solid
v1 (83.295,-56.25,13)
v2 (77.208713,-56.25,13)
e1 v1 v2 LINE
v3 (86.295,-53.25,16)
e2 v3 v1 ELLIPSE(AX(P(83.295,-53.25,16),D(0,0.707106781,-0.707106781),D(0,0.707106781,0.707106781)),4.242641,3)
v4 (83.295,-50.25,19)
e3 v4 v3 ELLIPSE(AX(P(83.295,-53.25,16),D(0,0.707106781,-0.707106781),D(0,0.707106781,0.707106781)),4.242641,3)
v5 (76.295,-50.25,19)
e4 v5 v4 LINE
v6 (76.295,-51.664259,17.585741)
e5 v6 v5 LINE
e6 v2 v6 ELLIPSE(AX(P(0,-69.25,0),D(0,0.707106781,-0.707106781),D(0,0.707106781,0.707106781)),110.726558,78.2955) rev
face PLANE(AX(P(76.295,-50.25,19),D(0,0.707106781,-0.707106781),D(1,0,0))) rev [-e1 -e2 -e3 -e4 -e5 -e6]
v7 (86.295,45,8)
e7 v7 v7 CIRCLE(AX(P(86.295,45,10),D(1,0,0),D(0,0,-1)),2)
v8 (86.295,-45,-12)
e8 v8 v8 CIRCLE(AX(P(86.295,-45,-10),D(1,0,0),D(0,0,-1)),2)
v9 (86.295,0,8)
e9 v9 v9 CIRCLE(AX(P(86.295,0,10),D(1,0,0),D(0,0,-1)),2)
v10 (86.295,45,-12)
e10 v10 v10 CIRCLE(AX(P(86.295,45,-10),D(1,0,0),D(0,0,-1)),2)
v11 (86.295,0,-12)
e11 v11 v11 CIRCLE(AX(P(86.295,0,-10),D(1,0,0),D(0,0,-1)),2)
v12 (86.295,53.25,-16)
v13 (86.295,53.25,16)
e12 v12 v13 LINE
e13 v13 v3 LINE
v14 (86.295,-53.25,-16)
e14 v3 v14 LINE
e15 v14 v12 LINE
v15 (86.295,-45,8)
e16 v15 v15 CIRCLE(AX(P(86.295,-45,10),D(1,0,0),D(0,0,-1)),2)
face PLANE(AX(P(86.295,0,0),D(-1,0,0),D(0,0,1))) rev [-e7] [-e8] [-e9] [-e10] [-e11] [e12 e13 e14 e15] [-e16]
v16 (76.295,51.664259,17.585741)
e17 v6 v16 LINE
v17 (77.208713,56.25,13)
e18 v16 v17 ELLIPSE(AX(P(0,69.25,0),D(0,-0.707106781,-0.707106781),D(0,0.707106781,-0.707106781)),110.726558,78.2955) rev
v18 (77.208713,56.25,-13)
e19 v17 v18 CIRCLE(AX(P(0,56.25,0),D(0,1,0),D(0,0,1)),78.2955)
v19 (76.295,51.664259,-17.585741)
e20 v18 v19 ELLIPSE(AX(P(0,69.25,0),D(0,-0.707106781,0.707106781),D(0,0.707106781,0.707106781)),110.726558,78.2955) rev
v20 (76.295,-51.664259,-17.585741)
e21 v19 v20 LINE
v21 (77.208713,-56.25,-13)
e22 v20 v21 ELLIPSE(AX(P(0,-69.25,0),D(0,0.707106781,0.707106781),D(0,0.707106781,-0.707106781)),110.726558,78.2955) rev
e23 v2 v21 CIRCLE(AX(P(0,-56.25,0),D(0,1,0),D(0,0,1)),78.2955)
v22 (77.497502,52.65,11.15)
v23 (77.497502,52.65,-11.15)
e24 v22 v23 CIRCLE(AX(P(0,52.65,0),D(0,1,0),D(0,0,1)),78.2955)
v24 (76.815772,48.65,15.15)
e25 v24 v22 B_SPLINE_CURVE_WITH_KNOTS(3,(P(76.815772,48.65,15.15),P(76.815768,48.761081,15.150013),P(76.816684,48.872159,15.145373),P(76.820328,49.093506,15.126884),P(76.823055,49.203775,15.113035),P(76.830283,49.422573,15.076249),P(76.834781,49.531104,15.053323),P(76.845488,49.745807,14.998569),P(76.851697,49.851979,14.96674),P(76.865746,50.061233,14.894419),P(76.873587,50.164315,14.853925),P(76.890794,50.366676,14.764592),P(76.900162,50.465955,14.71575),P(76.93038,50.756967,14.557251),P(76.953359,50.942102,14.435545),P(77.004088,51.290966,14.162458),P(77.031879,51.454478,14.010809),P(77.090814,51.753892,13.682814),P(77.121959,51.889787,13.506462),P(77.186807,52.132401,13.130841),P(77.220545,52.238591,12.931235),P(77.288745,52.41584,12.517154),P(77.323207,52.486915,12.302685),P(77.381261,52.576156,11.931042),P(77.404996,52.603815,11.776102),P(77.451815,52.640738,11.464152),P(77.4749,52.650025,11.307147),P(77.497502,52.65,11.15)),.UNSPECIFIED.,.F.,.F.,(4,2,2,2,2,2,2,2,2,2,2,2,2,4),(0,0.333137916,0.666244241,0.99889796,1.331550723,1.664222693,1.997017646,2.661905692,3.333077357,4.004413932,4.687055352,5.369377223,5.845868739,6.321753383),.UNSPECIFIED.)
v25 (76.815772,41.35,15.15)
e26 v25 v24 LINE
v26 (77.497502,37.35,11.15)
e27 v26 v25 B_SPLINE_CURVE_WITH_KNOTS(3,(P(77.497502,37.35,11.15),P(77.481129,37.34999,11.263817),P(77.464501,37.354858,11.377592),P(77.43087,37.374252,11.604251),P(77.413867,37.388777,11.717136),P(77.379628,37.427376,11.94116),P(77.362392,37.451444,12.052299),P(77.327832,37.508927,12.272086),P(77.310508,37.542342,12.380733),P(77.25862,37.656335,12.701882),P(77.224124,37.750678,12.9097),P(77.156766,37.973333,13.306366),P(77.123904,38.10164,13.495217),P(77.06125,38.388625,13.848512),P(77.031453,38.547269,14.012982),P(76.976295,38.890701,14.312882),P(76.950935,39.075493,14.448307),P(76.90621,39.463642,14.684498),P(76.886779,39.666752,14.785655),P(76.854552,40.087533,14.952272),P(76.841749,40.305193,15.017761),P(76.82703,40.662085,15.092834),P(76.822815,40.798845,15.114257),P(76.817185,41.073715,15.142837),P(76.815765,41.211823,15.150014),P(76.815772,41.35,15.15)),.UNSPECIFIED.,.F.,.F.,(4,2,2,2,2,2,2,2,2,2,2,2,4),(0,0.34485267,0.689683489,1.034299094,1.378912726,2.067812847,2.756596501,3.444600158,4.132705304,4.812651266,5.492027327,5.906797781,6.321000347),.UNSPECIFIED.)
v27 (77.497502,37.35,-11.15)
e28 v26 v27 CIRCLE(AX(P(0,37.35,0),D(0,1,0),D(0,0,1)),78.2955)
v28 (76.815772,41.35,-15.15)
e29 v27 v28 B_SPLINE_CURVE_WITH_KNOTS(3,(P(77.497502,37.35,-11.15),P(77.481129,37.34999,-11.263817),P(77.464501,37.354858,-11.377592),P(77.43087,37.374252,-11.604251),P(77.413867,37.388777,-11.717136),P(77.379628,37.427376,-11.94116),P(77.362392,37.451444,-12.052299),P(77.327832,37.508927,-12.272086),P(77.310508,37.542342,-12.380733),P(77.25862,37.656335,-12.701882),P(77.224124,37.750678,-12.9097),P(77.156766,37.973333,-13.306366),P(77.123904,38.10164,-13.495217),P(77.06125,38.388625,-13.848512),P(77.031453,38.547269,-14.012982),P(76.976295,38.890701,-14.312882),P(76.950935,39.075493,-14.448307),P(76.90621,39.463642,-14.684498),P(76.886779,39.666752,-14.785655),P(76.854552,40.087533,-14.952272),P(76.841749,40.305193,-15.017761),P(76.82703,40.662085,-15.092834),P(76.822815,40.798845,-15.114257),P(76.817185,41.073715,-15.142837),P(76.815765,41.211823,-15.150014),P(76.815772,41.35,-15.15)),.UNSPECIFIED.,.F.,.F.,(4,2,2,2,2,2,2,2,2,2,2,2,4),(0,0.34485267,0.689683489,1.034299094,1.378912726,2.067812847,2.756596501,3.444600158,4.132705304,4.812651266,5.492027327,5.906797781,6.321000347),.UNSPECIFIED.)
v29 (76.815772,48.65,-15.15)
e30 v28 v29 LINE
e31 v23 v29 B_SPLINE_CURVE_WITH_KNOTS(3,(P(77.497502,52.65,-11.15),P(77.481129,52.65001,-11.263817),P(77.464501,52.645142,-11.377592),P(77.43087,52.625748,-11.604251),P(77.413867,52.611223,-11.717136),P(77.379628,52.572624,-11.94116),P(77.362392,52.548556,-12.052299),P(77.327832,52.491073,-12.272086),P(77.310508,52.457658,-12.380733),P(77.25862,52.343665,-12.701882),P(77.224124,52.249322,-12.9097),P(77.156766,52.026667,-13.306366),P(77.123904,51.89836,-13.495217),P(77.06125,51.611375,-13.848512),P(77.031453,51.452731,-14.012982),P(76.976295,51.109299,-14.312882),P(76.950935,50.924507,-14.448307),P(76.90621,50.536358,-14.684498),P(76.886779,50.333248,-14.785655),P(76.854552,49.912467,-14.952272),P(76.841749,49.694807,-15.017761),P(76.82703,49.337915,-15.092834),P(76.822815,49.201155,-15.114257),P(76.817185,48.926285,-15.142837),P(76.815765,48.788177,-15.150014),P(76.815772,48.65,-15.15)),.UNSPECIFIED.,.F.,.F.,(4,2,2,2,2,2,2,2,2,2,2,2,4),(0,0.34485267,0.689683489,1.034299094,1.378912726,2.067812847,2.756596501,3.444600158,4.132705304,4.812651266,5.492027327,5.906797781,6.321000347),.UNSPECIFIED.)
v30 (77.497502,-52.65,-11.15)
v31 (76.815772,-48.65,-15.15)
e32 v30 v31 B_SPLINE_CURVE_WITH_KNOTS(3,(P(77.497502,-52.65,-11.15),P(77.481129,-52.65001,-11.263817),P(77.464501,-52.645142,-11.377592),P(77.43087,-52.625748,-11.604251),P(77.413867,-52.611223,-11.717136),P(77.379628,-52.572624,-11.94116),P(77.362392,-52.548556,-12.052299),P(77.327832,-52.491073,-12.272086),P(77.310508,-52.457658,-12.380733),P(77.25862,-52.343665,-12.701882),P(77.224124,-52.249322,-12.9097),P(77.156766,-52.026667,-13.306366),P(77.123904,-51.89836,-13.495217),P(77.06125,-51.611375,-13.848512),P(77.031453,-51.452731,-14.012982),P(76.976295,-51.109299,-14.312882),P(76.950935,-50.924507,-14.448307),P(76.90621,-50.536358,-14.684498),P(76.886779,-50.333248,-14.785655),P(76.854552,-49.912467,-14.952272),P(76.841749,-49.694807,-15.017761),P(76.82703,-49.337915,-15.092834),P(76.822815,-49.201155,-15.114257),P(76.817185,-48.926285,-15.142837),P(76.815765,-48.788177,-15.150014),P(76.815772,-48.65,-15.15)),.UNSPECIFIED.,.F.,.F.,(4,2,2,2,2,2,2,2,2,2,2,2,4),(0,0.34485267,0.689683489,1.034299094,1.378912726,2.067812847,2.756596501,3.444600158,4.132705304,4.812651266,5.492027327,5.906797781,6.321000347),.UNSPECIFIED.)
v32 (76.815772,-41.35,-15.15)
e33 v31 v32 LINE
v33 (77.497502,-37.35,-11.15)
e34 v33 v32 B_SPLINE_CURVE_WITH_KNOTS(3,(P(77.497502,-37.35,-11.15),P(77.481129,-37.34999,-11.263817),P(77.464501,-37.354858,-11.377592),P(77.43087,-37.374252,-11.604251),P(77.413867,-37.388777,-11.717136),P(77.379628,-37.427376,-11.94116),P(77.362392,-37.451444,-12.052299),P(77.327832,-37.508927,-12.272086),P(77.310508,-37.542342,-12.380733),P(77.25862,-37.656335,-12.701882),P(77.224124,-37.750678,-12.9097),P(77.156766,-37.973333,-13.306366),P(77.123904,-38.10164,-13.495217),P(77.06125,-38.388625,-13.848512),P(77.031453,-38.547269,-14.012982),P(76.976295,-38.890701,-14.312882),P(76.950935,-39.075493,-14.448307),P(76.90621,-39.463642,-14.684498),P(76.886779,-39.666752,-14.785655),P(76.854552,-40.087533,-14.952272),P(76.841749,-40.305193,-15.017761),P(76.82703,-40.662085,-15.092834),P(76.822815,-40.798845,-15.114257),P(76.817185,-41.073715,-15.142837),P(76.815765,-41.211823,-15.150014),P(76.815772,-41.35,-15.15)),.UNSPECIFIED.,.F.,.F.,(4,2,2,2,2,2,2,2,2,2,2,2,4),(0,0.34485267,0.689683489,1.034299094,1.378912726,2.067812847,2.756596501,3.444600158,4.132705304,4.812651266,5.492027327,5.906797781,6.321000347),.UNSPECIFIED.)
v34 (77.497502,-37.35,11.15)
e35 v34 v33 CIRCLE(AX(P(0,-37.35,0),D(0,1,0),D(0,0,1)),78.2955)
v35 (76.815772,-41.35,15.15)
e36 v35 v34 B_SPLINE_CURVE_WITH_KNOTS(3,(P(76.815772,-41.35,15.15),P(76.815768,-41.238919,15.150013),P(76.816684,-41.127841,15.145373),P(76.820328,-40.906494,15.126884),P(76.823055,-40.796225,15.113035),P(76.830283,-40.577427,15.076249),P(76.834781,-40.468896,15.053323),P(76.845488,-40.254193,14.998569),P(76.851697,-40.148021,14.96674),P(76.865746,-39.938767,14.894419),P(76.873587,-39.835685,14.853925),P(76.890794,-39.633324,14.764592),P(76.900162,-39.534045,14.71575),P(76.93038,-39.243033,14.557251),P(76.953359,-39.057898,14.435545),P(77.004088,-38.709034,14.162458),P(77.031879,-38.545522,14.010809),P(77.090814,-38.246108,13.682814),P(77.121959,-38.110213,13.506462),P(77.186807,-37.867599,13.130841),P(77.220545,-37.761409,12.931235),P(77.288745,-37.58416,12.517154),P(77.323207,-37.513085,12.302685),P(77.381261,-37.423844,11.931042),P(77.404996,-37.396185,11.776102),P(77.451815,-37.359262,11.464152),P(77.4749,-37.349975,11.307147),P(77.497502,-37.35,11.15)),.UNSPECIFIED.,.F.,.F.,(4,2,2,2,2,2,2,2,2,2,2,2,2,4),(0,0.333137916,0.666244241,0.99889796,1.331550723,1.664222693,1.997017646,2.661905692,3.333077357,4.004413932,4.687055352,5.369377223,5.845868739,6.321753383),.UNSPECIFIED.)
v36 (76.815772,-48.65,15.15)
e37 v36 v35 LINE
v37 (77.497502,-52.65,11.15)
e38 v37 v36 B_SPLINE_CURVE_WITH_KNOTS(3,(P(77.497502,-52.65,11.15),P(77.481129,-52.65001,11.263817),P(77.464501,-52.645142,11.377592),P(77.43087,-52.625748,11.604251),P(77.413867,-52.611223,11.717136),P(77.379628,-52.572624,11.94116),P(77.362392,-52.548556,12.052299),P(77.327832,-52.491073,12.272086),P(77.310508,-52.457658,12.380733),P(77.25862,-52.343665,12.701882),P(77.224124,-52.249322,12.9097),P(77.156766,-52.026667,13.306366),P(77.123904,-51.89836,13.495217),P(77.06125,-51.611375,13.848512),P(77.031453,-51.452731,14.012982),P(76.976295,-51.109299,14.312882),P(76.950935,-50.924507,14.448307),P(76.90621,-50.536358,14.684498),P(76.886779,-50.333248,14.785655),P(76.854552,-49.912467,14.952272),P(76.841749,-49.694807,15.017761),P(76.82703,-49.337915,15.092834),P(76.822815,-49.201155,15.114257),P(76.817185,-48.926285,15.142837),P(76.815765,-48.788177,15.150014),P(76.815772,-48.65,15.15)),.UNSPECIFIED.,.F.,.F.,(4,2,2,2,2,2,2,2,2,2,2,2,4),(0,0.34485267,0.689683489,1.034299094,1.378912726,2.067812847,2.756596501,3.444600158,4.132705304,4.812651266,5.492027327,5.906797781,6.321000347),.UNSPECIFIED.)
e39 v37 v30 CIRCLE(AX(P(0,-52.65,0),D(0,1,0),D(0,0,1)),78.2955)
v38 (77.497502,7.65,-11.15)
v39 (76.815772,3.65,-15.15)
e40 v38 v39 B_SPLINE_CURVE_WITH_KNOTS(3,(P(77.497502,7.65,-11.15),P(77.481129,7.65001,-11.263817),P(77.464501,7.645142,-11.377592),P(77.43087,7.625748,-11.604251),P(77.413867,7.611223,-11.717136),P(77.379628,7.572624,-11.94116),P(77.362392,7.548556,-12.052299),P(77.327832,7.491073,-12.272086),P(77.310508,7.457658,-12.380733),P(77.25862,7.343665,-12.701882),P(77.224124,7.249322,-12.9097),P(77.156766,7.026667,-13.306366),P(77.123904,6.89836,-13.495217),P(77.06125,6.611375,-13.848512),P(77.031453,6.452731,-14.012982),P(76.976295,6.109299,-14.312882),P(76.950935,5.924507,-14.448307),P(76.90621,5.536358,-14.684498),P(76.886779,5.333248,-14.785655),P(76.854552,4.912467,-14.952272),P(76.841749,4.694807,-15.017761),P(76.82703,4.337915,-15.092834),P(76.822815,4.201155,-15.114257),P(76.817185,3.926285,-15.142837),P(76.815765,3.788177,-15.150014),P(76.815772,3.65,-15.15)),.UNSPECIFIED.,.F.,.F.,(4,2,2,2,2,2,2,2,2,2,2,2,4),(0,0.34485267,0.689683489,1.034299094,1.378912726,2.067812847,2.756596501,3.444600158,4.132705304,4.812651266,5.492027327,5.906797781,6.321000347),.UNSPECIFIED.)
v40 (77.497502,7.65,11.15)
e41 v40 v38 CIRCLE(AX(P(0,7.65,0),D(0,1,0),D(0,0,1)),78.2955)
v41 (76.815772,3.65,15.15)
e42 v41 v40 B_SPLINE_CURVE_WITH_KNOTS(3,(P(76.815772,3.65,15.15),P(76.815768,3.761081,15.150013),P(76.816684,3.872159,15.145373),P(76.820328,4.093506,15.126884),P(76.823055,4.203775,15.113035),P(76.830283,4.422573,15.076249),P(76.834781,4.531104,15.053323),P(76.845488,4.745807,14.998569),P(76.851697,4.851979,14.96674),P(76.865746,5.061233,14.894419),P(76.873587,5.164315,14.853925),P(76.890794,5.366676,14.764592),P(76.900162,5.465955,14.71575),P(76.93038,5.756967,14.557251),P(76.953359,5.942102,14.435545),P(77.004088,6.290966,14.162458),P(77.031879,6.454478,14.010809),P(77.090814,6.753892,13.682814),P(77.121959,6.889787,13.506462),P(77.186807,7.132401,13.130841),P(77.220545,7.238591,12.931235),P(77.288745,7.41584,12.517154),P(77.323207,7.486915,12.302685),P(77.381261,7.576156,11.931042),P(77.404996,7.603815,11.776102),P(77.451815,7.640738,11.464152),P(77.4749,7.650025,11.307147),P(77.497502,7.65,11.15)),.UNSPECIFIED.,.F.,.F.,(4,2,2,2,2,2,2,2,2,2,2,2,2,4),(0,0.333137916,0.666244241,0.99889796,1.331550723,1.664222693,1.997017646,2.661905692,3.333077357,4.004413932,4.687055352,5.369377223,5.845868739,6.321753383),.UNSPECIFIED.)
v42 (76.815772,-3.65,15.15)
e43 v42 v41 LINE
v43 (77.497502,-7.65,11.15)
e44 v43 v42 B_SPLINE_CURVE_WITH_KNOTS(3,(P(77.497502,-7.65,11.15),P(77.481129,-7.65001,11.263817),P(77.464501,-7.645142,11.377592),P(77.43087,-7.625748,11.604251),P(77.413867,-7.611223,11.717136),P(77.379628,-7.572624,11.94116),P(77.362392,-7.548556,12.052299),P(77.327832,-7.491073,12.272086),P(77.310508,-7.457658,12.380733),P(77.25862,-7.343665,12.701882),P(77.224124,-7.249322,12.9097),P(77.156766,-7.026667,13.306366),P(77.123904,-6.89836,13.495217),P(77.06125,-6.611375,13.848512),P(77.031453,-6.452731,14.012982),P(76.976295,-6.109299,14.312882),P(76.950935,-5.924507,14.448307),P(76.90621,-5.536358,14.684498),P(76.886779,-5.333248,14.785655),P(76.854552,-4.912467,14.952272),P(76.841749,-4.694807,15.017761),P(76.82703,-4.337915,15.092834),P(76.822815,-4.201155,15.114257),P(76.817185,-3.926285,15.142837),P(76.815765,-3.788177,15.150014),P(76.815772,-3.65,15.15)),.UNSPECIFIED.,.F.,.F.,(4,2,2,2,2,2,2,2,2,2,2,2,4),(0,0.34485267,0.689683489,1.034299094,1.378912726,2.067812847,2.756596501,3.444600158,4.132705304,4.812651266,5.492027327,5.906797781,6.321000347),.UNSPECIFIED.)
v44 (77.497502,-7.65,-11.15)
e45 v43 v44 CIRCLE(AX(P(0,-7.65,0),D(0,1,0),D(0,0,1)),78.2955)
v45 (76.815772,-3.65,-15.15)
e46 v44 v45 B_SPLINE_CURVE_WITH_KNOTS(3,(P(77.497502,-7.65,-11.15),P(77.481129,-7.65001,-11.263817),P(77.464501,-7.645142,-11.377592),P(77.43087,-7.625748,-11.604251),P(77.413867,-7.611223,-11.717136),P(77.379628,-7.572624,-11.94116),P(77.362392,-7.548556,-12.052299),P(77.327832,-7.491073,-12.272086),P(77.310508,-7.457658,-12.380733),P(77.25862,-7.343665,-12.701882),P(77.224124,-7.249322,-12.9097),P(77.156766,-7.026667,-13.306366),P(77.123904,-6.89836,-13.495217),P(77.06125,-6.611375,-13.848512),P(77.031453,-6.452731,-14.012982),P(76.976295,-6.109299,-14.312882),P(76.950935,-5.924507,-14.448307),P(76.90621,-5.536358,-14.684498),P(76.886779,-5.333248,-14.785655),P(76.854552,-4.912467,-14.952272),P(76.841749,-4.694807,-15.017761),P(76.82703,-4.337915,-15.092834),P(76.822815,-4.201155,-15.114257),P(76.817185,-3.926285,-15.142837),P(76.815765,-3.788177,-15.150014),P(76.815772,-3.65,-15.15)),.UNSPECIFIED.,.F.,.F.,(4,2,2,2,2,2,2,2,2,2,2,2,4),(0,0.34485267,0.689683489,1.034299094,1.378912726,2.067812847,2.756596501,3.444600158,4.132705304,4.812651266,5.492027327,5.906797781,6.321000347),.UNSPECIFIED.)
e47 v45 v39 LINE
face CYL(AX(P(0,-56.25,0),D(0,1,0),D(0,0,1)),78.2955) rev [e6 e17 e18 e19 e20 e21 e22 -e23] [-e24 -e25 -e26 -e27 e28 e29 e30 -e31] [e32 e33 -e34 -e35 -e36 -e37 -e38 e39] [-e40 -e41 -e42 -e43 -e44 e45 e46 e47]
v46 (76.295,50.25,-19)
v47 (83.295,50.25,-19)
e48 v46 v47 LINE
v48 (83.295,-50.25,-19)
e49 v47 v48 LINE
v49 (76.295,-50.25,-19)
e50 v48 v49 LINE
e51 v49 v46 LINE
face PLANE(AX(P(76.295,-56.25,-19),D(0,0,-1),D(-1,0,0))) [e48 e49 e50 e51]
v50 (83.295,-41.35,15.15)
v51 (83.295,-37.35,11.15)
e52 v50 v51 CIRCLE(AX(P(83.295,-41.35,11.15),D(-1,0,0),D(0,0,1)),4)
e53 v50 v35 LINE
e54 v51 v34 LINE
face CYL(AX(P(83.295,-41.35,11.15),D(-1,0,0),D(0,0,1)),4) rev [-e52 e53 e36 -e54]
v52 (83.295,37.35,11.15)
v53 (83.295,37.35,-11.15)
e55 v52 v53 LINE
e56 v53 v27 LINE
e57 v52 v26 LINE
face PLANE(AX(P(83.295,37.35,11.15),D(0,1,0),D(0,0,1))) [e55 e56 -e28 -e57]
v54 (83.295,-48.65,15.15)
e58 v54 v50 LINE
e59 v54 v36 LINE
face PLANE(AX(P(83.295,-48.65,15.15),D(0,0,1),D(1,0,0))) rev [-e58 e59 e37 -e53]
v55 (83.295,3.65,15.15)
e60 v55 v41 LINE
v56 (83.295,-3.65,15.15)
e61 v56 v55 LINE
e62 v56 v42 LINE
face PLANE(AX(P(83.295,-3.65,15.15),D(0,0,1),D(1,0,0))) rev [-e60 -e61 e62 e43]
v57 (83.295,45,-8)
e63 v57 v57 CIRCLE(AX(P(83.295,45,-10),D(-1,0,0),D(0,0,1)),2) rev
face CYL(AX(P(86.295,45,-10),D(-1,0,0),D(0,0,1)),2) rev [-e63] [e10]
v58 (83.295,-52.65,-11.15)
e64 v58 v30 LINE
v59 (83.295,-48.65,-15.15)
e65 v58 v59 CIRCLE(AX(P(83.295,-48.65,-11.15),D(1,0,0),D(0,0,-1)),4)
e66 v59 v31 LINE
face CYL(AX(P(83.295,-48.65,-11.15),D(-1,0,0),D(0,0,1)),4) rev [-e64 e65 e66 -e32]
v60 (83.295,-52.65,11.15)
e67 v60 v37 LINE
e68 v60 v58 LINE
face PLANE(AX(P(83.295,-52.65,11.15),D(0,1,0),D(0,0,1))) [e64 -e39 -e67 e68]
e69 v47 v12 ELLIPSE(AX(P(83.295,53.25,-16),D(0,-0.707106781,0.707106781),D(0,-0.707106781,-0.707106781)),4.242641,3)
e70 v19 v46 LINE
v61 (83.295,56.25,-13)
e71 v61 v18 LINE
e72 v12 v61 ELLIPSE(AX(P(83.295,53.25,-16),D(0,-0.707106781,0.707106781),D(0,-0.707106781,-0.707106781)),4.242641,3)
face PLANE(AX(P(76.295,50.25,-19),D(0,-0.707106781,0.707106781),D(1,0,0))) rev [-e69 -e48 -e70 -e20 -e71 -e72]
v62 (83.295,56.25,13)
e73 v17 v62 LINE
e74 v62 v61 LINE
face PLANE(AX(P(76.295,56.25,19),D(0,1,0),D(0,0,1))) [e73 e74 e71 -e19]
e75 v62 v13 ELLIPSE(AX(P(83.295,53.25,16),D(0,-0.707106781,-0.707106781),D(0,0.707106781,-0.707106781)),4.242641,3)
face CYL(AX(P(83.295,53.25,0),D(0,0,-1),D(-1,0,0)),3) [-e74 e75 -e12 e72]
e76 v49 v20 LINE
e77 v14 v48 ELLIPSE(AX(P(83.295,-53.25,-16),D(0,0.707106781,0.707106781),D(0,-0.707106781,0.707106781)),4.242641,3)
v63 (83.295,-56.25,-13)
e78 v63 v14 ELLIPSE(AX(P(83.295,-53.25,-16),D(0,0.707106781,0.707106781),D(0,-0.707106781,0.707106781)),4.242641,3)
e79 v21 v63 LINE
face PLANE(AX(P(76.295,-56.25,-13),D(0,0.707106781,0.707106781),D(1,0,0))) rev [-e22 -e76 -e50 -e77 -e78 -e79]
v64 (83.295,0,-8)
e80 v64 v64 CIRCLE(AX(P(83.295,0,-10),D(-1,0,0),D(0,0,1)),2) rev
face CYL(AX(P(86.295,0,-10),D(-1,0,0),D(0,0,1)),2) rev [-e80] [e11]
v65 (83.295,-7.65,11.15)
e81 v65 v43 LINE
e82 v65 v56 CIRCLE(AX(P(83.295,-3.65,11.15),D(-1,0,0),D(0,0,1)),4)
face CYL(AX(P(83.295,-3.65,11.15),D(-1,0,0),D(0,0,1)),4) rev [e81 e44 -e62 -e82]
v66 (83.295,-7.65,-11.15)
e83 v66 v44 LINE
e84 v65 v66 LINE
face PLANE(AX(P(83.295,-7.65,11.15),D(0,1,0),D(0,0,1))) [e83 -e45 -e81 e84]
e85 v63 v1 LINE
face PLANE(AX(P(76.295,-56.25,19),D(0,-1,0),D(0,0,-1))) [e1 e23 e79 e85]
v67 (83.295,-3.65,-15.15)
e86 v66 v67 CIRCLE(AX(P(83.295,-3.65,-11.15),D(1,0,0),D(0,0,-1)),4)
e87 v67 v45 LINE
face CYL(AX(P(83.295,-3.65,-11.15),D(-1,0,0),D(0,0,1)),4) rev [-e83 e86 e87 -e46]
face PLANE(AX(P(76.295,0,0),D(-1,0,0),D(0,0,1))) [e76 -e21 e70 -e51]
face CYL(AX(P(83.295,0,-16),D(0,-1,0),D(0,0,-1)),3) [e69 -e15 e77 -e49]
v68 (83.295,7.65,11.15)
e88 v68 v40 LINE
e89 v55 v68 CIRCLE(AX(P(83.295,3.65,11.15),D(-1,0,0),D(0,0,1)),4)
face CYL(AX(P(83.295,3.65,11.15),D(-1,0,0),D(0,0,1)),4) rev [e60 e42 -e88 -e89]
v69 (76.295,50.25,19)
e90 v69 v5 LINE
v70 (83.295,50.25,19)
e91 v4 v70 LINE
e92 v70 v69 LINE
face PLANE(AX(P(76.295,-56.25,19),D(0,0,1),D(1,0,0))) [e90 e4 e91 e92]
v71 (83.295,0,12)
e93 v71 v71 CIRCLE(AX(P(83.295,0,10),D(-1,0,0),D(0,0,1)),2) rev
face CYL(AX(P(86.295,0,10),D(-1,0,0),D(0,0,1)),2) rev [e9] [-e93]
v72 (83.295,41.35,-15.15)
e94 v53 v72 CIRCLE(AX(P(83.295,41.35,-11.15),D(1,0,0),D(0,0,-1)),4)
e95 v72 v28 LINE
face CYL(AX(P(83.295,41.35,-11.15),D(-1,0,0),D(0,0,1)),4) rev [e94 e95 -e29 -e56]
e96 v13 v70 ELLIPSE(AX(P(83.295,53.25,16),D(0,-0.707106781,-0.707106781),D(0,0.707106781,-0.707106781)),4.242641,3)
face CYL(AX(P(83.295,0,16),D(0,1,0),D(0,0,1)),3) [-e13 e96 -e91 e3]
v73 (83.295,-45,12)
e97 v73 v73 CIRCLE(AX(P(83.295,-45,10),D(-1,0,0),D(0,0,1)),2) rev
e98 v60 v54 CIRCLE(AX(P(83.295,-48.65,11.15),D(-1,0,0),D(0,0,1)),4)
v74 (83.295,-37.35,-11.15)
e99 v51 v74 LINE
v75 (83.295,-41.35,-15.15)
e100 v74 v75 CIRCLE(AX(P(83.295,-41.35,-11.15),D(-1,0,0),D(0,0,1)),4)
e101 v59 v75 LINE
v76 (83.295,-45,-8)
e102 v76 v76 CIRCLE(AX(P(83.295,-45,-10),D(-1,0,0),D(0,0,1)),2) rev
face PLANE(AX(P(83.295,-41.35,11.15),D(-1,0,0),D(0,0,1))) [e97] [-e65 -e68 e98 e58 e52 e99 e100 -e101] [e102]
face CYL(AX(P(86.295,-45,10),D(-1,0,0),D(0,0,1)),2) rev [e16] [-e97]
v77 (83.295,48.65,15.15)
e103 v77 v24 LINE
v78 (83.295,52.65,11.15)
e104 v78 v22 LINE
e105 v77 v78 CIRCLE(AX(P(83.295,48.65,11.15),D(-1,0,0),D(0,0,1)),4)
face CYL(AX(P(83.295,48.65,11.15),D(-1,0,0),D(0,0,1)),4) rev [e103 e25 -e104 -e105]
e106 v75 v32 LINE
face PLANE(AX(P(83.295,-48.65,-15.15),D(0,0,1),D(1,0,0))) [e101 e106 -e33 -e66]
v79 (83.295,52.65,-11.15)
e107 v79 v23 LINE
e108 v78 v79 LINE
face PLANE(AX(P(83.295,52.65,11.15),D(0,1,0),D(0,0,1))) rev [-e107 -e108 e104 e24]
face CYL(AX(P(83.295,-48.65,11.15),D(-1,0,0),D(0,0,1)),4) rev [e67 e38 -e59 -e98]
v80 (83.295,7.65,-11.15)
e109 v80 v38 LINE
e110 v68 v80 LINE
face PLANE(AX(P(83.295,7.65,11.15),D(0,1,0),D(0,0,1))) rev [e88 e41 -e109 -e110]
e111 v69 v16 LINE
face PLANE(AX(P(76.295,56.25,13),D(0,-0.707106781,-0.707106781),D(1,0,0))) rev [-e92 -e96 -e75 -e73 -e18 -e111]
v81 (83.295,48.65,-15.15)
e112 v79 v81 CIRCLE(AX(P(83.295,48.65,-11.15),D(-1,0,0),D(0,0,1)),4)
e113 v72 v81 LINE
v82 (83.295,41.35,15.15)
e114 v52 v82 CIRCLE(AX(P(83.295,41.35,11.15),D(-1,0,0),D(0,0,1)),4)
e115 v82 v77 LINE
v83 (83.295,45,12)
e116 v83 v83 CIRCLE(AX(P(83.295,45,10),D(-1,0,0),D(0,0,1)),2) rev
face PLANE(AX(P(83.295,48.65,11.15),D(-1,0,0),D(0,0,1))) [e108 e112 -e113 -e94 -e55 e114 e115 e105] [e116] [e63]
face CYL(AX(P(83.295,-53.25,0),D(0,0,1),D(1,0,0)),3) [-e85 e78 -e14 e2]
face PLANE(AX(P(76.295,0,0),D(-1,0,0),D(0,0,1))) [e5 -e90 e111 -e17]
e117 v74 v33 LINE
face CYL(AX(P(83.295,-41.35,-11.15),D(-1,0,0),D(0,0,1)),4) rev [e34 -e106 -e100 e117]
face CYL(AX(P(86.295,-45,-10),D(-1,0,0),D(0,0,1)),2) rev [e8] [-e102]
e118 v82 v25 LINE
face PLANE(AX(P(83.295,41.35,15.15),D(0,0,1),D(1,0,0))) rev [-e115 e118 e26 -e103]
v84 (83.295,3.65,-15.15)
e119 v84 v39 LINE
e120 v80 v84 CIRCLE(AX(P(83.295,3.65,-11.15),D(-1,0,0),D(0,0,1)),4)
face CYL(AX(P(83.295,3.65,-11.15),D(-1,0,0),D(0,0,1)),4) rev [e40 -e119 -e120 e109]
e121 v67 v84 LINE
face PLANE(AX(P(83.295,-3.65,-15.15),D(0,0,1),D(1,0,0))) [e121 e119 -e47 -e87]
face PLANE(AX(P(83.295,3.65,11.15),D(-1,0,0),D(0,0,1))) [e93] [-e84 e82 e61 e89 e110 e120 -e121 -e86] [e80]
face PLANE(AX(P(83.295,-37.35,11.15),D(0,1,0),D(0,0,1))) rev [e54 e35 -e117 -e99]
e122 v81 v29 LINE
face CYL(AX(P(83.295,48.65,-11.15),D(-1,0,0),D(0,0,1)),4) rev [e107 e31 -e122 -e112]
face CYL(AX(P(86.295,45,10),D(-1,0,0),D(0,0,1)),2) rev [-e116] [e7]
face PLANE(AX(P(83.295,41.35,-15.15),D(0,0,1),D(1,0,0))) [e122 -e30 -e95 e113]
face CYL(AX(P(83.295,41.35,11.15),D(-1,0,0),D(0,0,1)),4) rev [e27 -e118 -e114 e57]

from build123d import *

# Parameters (mm, degrees)
BOSS_EXTRUDE1_DEPTH      = 8
BOSS_EXTRUDE1_DEPTH_BACK = 2
SKETCH2_W                = 38
SKETCH2_H                = 112.5
CUT_EXTRUDE1_START       = -2
CUT_EXTRUDE1_DEPTH       = 7
SKETCH3_3_R              = 2
CUT_EXTRUDE2_DEPTH       = 60.908784832
LPATTERN1_COUNT          = 2
LPATTERN1_PITCH          = 45
LPATTERN1_COL_COUNT      = 2
LPATTERN1_COL_PITCH      = 45
FILLET1_R                = 3
CHAMFER1_START           = 75
CHAMFER1_DEPTH           = 12
CUT_EXTRUDE3_DEPTH       = 105.74678766
CUT_EXTRUDE3_DEPTH_BACK  = 105.74678766
SKETCH1_R                = 78.2955


with BuildPart() as part:
    # Sketch2 → Boss-Extrude1 (new, two sides: drawn at the far end of the back side and taken through both)
    with BuildSketch(Plane(origin=(78.295, 0, 0), x_dir=(0, 0, -1), z_dir=(1, 0, 0)).offset(-BOSS_EXTRUDE1_DEPTH_BACK)):
        Rectangle(SKETCH2_W, SKETCH2_H)
    extrude(amount=BOSS_EXTRUDE1_DEPTH + BOSS_EXTRUDE1_DEPTH_BACK)

    # Sketch3 → Cut-Extrude1 (cut)
    with BuildSketch(Plane(origin=(78.295, 0, 0), x_dir=(0, 0, -1), z_dir=(1, 0, 0)).offset(CUT_EXTRUDE1_START)):
        with BuildLine():
            Line((-11.15, -7.65), (11.15, -7.65))
            ThreePointArc((11.15, -7.65), (13.978427125, -6.478427125), (15.15, -3.65))
            Line((15.15, -3.65), (15.15, 3.65))
            ThreePointArc((15.15, 3.65), (13.978427125, 6.478427125), (11.15, 7.65))
            Line((11.15, 7.65), (-11.15, 7.65))
            ThreePointArc((-11.15, 7.65), (-13.978427125, 6.478427125), (-15.15, 3.65))
            Line((-15.15, 3.65), (-15.15, -3.65))
            ThreePointArc((-15.15, -3.65), (-13.978427125, -6.478427125), (-11.15, -7.65))
        make_face()
    cut_extrude1 = extrude(amount=CUT_EXTRUDE1_DEPTH, mode=Mode.SUBTRACT)

    # Sketch3<3> → Cut-Extrude2 (cut, through all)
    with BuildSketch(Plane(origin=(78.295, 0, 0), x_dir=(0, 0, -1), z_dir=(1, 0, 0))):
        with Locations(Location((-10, 0, 0), (0, 0, 180))):
            Circle(SKETCH3_3_R)
        with Locations(Location((10, 0, 0), (0, 0, 180))):
            Circle(SKETCH3_3_R)
    cut_extrude2 = extrude(amount=CUT_EXTRUDE2_DEPTH, mode=Mode.SUBTRACT)

    # LPattern1: Cut-Extrude1, Cut-Extrude2 ×2
    with Locations(*[(0, -i * LPATTERN1_PITCH, 0) for i in range(1, LPATTERN1_COUNT)]):
        add(cut_extrude1, mode=Mode.SUBTRACT)
        add(cut_extrude2, mode=Mode.SUBTRACT)

    # LPattern1 col: Cut-Extrude1, Cut-Extrude2 ×2
    with Locations(*[(0, i * LPATTERN1_COL_PITCH, 0) for i in range(1, LPATTERN1_COL_COUNT)]):
        add(cut_extrude1, mode=Mode.SUBTRACT)
        add(cut_extrude2, mode=Mode.SUBTRACT)

    # Fillet1
    fillet1_edges = [part.edges().sort_by_distance(p)[0] for p in [
        (86.295, 0, -19),
        (86.295, 56.25, 0),
        (86.295, 0, 19),
        (86.295, -56.25, 0),
    ]]
    fillet(fillet1_edges, radius=FILLET1_R)

    # Chamfer1: read off the stored shape, not the designer's step
    # Chamfer1 outline → Chamfer1 (cut)
    with BuildSketch(Plane.YZ.offset(CHAMFER1_START)):
        Polygon((-56.25, 19), (-56.25, 13), (-50.25, 19), align=None)
        Polygon((-50.25, -19), (-56.25, -13), (-56.25, -19), align=None)
        Polygon((56.25, 19), (50.25, 19), (56.25, 13), align=None)
        Polygon((56.25, -13), (50.25, -19), (56.25, -19), align=None)
    extrude(amount=CHAMFER1_DEPTH, mode=Mode.SUBTRACT)

    # Sketch1 → Cut-Extrude3 (cut, two sides: drawn at the far end of the back side and taken through both)
    with BuildSketch(Plane(origin=(0, 0, 0), x_dir=(1, 0, 0), z_dir=(0, 1, 0)).offset(-CUT_EXTRUDE3_DEPTH_BACK)):
        Circle(SKETCH1_R)
    extrude(amount=CUT_EXTRUDE3_DEPTH + CUT_EXTRUDE3_DEPTH_BACK, mode=Mode.SUBTRACT)


solid = part.part
